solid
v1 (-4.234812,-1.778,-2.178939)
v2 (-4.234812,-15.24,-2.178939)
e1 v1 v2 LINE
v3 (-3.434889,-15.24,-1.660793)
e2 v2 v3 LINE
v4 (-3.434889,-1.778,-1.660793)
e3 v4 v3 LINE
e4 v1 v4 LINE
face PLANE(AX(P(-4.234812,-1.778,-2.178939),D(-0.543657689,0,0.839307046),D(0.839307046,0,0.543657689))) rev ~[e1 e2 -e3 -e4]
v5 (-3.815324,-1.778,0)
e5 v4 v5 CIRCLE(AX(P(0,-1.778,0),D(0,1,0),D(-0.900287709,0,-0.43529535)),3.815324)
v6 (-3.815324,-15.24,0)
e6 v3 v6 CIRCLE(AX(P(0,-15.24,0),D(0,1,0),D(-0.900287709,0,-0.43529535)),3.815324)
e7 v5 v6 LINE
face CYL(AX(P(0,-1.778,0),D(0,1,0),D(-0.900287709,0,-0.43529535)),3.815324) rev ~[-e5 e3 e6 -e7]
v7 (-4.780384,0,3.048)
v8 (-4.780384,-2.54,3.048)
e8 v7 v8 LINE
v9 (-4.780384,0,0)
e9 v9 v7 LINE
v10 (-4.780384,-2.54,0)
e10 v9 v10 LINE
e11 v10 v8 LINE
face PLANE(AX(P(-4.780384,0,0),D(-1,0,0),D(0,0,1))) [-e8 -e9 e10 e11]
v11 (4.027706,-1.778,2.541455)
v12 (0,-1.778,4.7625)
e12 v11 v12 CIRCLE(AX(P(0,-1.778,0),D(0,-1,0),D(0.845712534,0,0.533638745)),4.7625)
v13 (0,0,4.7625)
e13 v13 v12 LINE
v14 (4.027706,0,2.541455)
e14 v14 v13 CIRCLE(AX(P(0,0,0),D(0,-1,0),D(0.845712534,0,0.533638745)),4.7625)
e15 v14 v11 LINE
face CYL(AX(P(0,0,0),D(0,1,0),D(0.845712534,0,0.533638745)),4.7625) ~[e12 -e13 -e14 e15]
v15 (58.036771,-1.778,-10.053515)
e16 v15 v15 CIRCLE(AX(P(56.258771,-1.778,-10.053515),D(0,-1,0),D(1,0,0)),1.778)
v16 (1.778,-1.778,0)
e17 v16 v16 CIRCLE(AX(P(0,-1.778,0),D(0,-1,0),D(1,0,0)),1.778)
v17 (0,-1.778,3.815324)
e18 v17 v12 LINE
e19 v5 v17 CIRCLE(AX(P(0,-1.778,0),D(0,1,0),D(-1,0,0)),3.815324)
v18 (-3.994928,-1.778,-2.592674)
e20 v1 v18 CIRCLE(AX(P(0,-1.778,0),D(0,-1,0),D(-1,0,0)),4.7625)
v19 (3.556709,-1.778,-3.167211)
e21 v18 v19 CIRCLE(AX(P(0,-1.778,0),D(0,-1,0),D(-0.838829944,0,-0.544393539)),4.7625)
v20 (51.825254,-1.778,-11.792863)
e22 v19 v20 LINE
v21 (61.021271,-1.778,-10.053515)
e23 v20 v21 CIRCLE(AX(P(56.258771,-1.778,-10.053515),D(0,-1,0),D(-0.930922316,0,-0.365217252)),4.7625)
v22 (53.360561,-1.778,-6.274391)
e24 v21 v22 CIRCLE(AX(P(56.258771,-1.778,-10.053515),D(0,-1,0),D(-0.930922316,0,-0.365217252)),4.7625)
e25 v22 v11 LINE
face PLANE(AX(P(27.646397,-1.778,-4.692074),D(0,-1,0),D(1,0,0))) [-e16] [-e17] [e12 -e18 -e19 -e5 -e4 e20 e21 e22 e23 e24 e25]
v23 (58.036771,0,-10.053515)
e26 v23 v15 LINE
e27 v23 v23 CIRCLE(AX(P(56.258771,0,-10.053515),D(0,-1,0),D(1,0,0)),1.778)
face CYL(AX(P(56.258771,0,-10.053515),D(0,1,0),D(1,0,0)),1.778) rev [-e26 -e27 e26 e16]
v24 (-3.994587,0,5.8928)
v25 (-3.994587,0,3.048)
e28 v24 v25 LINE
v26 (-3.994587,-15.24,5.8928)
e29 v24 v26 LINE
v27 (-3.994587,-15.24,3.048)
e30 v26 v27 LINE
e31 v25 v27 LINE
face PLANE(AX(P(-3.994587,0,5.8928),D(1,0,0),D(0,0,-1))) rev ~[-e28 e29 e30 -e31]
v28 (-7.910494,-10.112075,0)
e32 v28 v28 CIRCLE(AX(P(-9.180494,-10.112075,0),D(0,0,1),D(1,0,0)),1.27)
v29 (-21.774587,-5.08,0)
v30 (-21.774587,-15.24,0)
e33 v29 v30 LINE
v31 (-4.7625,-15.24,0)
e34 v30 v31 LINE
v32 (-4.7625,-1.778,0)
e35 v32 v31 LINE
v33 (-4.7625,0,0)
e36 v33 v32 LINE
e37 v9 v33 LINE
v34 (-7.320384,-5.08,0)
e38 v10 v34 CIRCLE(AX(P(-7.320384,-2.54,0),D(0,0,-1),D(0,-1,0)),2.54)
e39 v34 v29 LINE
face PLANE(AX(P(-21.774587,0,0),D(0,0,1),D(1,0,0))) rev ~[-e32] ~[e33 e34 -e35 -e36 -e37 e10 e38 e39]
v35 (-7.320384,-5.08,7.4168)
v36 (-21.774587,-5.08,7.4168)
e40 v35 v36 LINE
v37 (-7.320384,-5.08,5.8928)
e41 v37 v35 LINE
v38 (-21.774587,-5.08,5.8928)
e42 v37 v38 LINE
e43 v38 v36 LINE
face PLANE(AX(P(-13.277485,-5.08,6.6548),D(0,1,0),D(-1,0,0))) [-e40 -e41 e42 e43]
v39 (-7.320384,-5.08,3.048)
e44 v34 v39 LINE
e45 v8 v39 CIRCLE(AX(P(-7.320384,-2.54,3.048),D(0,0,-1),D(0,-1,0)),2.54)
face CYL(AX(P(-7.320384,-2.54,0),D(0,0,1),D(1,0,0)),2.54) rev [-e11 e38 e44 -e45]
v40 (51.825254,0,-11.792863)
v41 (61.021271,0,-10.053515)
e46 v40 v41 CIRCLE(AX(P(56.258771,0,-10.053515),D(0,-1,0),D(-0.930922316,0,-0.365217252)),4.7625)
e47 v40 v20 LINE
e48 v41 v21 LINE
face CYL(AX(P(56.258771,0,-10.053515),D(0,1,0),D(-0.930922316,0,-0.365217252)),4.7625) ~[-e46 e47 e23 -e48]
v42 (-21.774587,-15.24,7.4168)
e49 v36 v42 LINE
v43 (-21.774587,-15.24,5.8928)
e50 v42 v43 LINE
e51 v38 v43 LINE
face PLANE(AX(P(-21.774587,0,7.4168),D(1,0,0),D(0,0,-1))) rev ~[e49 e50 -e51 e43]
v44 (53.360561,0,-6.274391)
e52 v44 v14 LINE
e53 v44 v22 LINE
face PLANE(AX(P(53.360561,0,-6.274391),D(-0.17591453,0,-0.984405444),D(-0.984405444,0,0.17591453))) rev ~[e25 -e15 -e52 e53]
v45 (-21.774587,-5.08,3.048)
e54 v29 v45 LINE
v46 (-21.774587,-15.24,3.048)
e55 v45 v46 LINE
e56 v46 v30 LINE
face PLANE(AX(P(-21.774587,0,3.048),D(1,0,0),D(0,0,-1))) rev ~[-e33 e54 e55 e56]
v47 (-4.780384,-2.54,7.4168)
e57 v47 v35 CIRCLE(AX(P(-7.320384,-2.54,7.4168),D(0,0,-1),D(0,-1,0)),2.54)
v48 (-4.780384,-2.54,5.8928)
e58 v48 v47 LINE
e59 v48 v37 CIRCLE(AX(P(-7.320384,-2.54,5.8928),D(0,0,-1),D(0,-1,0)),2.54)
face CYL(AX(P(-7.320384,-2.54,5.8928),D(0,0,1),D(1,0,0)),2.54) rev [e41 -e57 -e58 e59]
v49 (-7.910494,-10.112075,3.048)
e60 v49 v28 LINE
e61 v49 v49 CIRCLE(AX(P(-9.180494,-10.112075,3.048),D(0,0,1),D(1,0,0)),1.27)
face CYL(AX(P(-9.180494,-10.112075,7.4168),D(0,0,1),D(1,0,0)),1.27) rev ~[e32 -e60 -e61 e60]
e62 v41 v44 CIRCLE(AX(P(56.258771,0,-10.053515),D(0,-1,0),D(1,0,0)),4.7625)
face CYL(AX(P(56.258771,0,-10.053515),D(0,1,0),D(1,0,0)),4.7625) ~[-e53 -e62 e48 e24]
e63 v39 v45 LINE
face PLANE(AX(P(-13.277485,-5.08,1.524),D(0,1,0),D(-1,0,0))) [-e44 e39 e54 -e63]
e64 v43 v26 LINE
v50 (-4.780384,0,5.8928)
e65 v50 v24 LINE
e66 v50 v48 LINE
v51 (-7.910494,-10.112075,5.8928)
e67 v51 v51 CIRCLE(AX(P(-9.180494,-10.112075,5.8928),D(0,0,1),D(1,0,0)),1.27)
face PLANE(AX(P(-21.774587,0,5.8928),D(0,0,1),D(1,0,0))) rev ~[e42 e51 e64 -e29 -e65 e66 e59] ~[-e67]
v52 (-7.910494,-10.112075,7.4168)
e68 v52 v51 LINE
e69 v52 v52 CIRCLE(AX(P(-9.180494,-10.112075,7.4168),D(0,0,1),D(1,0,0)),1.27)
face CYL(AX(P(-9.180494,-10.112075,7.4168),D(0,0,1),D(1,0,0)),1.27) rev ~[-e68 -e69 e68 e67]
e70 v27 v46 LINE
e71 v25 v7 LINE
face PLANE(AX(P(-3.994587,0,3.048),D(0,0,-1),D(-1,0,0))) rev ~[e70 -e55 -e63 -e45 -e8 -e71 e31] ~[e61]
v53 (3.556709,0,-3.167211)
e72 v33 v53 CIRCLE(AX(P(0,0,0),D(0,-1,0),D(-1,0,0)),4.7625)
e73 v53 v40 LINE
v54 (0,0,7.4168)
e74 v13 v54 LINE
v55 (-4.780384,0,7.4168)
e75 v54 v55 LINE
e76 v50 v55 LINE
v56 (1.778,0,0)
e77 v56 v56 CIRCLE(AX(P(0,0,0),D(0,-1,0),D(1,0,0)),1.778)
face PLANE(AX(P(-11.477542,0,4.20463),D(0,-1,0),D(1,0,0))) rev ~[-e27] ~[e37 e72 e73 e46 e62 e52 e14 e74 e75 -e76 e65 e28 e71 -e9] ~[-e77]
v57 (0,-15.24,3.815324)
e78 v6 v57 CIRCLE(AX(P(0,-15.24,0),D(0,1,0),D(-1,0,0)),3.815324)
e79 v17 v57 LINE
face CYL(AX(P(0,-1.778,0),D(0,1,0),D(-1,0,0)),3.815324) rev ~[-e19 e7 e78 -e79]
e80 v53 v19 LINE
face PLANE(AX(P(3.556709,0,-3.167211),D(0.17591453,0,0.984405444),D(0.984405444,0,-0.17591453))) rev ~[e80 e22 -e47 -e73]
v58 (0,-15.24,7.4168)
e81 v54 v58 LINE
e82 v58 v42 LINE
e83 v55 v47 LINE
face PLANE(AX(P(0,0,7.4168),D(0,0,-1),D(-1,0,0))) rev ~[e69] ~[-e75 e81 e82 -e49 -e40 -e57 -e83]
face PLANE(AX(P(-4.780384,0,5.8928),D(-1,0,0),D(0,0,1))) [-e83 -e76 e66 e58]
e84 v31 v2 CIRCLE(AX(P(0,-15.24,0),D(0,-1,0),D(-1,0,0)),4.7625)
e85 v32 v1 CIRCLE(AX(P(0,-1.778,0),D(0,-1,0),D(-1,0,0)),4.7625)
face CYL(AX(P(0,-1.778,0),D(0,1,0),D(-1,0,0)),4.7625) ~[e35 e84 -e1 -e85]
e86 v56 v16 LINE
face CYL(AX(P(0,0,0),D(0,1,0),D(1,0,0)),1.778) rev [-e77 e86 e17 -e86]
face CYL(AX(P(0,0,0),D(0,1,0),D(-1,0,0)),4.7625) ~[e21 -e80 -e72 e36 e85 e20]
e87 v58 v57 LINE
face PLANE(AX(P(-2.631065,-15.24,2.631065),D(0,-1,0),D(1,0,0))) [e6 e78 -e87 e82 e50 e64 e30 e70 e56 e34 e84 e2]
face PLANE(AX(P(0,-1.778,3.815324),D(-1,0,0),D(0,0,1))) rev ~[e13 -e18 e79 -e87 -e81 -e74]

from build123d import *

# Parameters (mm, degrees)
F0_R      = 1.778
F1_DEPTH  = 17.78
F3_R      = 1.778
F4_DEPTH  = 16.002
F2_R      = 1.27
F5_DEPTH  = 25.4
F7_DEPTH  = 2.54
F8_W      = 16.9942029752
F8_H      = 1.524
F8_H_2    = 3.048
F9_DEPTH  = 5.08
F11_DEPTH = 13.462
F12_R     = 2.54


# Not quite as in the source:
# - a feature names something its author has since deleted; it is built from what else it names


with BuildPart() as f1:
    # F0 (on Front) → F1 (new body)
    with BuildSketch(Plane.XZ):
        with BuildLine():
            Line((-21.7745867558, 0), (-5.7350052521, 0))
            Line((-5.7350052521, 0), (-4.7625, 0))
            ThreePointArc((-4.7625, 0), (-3.3675960454, 3.3675960454), (0, 4.7625))
            Line((0, 4.7625), (0, 7.4168))
            Line((0, 7.4168), (-21.7745867558, 7.4168))
            Line((-21.7745867558, 7.4168), (-21.7745867558, 5.8928))
            Line((-21.7745867558, 5.8928), (-3.9945867558, 5.8928))
            Line((-3.9945867558, 5.8928), (-3.9945867558, 3.048))
            Line((-3.9945867558, 3.048), (-21.7745867558, 3.048))
            Line((-21.7745867558, 3.048), (-21.7745867558, 0))
        make_face()
        with BuildLine():
            ThreePointArc((4.7625, 0), (4.4508557537, -1.6944879196), (3.5567092138, -3.1672110474))
            Line((3.5567092138, -3.1672110474), (51.8252535905, -11.7928625561))
            ThreePointArc((51.8252535905, -11.7928625561), (51.6705317006, -8.7770103), (53.3605608921, -6.2743906673))
            Line((53.3605608921, -6.2743906673), (4.0277059432, 2.5414545216))
            ThreePointArc((4.0277059432, 2.5414545216), (4.5751150698, 1.3227729767), (4.7625, 0))
        make_face()
        with BuildLine():
            ThreePointArc((0, 4.7625), (-3.3675960454, 3.3675960454), (-4.7625, 0))
            ThreePointArc((-4.7625, 0), (-1.6944879196, -4.4508557537), (3.5567092138, -3.1672110474))
            ThreePointArc((3.5567092138, -3.1672110474), (4.4508557537, -1.6944879196), (4.7625, 0))
            ThreePointArc((4.7625, 0), (4.5751150698, 1.3227729767), (4.0277059432, 2.5414545216))
            ThreePointArc((4.0277059432, 2.5414545216), (2.2997531488, 4.1704366324), (0, 4.7625))
        make_face()
        Circle(F0_R, mode=Mode.SUBTRACT)
        with BuildLine():
            ThreePointArc((53.3605608921, -6.2743906673), (51.6705317006, -8.7770103), (51.8252535905, -11.7928625561))
            ThreePointArc((51.8252535905, -11.7928625561), (57.1438640566, -14.7330470759), (61.0212711223, -10.0535153956))
            ThreePointArc((61.0212711223, -10.0535153956), (58.3657452594, -5.7824422007), (53.3605608921, -6.2743906673))
        make_face()
        with Locations((56.2587711223, -10.0535153956)):
            Circle(F0_R, mode=Mode.SUBTRACT)
    extrude(amount=F1_DEPTH)

    # F3 (on face) → F4 (cut)
    with BuildSketch(Plane.XZ.offset(17.78)):
        with BuildLine():
            ThreePointArc((4.0277059432, 2.5414545216), (2.2997531488, 4.1704366324), (0, 4.7625))
            ThreePointArc((0, 4.7625), (-3.3675960454, 3.3675960454), (-4.7625, 0))
            ThreePointArc((-4.7625, 0), (-4.5665768899, -1.3519547915), (-3.994927608, -2.5926742288))
            ThreePointArc((-3.994927608, -2.5926742288), (-0.3612920968, -4.7487760813), (3.5567092138, -3.1672110474))
            Line((3.5567092138, -3.1672110474), (51.8252535905, -11.7928625561))
            ThreePointArc((51.8252535905, -11.7928625561), (60.847010544, -11.3300204911), (53.3605608921, -6.2743906673))
            Line((53.3605608921, -6.2743906673), (4.0277059432, 2.5414545216))
        make_face()
        with Locations((56.2587711223, -10.0535153956)):
            Circle(F3_R, mode=Mode.SUBTRACT)
        Circle(F3_R, mode=Mode.SUBTRACT)
    extrude(amount=-F4_DEPTH, mode=Mode.SUBTRACT)

    # F2 (on face) → F5 (cut)
    with BuildSketch(Plane.XY.offset(7.4168)):
        with Locations((-9.1804936528, -10.1120751351)):
            Circle(F2_R)
    extrude(amount=-F5_DEPTH, mode=Mode.SUBTRACT)

    # F6 (on face) → F7 (cut)
    with BuildSketch(Plane.XZ.offset(17.78)):
        with BuildLine():
            Line((-21.7745867558, 0), (-4.7625, 0))
            ThreePointArc((-4.7625, 0), (-3.3675960454, 3.3675960454), (0, 4.7625))
            Line((0, 4.7625), (0, 7.4168))
            Line((0, 7.4168), (-21.7745867558, 7.4168))
            Line((-21.7745867558, 7.4168), (-21.7745867558, 5.8928))
            Line((-21.7745867558, 5.8928), (-3.9945867558, 5.8928))
            Line((-3.9945867558, 5.8928), (-3.9945867558, 3.048))
            Line((-3.9945867558, 3.048), (-21.7745867558, 3.048))
            Line((-21.7745867558, 3.048), (-21.7745867558, 0))
        make_face()
    extrude(amount=-F7_DEPTH, mode=Mode.SUBTRACT)

    # F8 (on face) → F9 (cut)
    with BuildSketch(Plane(origin=(0, 0, 0), x_dir=(-1, 0, 0), z_dir=(0, 1, 0))):
        with Locations((13.2774852682, 6.6548)):
            Rectangle(F8_W, F8_H)
        with Locations((13.2774852682, 1.524)):
            Rectangle(F8_W, F8_H_2)
    extrude(amount=-F9_DEPTH, mode=Mode.SUBTRACT)

    # F10 (on face) → F11 (join, through all)
    with BuildSketch(Plane.XZ.offset(1.778)):
        with BuildLine():
            ThreePointArc((-3.8153238056, 0), (-2.6978413354, 2.6978413354), (0, 3.8153238056))
            Line((0, 3.8153238056), (0, 4.7625))
            ThreePointArc((0, 4.7625), (-3.3675960454, 3.3675960454), (-4.7625, 0))
            Line((-4.7625, 0), (-3.8153238056, 0))
        make_face()
        with BuildLine():
            Line((-4.2348116803, -2.1789392561), (-3.434889127, -1.6607927104))
            ThreePointArc((-3.434889127, -1.6607927104), (-3.7189991932, -0.8519041865), (-3.8153238056, 0))
            Line((-3.8153238056, 0), (-4.7625, 0))
            ThreePointArc((-4.7625, 0), (-4.6286983525, -1.1209628946), (-4.2348116803, -2.1789392561))
        make_face()
    extrude(amount=F11_DEPTH)

    # F12
    f12_edges = [f1.edges().sort_by_distance(p)[0] for p in [
        (-4.780384, -5.08, 1.524),
        (-4.780384, -5.08, 6.6548),
    ]]
    fillet(f12_edges, radius=F12_R)


solid = f1.part
